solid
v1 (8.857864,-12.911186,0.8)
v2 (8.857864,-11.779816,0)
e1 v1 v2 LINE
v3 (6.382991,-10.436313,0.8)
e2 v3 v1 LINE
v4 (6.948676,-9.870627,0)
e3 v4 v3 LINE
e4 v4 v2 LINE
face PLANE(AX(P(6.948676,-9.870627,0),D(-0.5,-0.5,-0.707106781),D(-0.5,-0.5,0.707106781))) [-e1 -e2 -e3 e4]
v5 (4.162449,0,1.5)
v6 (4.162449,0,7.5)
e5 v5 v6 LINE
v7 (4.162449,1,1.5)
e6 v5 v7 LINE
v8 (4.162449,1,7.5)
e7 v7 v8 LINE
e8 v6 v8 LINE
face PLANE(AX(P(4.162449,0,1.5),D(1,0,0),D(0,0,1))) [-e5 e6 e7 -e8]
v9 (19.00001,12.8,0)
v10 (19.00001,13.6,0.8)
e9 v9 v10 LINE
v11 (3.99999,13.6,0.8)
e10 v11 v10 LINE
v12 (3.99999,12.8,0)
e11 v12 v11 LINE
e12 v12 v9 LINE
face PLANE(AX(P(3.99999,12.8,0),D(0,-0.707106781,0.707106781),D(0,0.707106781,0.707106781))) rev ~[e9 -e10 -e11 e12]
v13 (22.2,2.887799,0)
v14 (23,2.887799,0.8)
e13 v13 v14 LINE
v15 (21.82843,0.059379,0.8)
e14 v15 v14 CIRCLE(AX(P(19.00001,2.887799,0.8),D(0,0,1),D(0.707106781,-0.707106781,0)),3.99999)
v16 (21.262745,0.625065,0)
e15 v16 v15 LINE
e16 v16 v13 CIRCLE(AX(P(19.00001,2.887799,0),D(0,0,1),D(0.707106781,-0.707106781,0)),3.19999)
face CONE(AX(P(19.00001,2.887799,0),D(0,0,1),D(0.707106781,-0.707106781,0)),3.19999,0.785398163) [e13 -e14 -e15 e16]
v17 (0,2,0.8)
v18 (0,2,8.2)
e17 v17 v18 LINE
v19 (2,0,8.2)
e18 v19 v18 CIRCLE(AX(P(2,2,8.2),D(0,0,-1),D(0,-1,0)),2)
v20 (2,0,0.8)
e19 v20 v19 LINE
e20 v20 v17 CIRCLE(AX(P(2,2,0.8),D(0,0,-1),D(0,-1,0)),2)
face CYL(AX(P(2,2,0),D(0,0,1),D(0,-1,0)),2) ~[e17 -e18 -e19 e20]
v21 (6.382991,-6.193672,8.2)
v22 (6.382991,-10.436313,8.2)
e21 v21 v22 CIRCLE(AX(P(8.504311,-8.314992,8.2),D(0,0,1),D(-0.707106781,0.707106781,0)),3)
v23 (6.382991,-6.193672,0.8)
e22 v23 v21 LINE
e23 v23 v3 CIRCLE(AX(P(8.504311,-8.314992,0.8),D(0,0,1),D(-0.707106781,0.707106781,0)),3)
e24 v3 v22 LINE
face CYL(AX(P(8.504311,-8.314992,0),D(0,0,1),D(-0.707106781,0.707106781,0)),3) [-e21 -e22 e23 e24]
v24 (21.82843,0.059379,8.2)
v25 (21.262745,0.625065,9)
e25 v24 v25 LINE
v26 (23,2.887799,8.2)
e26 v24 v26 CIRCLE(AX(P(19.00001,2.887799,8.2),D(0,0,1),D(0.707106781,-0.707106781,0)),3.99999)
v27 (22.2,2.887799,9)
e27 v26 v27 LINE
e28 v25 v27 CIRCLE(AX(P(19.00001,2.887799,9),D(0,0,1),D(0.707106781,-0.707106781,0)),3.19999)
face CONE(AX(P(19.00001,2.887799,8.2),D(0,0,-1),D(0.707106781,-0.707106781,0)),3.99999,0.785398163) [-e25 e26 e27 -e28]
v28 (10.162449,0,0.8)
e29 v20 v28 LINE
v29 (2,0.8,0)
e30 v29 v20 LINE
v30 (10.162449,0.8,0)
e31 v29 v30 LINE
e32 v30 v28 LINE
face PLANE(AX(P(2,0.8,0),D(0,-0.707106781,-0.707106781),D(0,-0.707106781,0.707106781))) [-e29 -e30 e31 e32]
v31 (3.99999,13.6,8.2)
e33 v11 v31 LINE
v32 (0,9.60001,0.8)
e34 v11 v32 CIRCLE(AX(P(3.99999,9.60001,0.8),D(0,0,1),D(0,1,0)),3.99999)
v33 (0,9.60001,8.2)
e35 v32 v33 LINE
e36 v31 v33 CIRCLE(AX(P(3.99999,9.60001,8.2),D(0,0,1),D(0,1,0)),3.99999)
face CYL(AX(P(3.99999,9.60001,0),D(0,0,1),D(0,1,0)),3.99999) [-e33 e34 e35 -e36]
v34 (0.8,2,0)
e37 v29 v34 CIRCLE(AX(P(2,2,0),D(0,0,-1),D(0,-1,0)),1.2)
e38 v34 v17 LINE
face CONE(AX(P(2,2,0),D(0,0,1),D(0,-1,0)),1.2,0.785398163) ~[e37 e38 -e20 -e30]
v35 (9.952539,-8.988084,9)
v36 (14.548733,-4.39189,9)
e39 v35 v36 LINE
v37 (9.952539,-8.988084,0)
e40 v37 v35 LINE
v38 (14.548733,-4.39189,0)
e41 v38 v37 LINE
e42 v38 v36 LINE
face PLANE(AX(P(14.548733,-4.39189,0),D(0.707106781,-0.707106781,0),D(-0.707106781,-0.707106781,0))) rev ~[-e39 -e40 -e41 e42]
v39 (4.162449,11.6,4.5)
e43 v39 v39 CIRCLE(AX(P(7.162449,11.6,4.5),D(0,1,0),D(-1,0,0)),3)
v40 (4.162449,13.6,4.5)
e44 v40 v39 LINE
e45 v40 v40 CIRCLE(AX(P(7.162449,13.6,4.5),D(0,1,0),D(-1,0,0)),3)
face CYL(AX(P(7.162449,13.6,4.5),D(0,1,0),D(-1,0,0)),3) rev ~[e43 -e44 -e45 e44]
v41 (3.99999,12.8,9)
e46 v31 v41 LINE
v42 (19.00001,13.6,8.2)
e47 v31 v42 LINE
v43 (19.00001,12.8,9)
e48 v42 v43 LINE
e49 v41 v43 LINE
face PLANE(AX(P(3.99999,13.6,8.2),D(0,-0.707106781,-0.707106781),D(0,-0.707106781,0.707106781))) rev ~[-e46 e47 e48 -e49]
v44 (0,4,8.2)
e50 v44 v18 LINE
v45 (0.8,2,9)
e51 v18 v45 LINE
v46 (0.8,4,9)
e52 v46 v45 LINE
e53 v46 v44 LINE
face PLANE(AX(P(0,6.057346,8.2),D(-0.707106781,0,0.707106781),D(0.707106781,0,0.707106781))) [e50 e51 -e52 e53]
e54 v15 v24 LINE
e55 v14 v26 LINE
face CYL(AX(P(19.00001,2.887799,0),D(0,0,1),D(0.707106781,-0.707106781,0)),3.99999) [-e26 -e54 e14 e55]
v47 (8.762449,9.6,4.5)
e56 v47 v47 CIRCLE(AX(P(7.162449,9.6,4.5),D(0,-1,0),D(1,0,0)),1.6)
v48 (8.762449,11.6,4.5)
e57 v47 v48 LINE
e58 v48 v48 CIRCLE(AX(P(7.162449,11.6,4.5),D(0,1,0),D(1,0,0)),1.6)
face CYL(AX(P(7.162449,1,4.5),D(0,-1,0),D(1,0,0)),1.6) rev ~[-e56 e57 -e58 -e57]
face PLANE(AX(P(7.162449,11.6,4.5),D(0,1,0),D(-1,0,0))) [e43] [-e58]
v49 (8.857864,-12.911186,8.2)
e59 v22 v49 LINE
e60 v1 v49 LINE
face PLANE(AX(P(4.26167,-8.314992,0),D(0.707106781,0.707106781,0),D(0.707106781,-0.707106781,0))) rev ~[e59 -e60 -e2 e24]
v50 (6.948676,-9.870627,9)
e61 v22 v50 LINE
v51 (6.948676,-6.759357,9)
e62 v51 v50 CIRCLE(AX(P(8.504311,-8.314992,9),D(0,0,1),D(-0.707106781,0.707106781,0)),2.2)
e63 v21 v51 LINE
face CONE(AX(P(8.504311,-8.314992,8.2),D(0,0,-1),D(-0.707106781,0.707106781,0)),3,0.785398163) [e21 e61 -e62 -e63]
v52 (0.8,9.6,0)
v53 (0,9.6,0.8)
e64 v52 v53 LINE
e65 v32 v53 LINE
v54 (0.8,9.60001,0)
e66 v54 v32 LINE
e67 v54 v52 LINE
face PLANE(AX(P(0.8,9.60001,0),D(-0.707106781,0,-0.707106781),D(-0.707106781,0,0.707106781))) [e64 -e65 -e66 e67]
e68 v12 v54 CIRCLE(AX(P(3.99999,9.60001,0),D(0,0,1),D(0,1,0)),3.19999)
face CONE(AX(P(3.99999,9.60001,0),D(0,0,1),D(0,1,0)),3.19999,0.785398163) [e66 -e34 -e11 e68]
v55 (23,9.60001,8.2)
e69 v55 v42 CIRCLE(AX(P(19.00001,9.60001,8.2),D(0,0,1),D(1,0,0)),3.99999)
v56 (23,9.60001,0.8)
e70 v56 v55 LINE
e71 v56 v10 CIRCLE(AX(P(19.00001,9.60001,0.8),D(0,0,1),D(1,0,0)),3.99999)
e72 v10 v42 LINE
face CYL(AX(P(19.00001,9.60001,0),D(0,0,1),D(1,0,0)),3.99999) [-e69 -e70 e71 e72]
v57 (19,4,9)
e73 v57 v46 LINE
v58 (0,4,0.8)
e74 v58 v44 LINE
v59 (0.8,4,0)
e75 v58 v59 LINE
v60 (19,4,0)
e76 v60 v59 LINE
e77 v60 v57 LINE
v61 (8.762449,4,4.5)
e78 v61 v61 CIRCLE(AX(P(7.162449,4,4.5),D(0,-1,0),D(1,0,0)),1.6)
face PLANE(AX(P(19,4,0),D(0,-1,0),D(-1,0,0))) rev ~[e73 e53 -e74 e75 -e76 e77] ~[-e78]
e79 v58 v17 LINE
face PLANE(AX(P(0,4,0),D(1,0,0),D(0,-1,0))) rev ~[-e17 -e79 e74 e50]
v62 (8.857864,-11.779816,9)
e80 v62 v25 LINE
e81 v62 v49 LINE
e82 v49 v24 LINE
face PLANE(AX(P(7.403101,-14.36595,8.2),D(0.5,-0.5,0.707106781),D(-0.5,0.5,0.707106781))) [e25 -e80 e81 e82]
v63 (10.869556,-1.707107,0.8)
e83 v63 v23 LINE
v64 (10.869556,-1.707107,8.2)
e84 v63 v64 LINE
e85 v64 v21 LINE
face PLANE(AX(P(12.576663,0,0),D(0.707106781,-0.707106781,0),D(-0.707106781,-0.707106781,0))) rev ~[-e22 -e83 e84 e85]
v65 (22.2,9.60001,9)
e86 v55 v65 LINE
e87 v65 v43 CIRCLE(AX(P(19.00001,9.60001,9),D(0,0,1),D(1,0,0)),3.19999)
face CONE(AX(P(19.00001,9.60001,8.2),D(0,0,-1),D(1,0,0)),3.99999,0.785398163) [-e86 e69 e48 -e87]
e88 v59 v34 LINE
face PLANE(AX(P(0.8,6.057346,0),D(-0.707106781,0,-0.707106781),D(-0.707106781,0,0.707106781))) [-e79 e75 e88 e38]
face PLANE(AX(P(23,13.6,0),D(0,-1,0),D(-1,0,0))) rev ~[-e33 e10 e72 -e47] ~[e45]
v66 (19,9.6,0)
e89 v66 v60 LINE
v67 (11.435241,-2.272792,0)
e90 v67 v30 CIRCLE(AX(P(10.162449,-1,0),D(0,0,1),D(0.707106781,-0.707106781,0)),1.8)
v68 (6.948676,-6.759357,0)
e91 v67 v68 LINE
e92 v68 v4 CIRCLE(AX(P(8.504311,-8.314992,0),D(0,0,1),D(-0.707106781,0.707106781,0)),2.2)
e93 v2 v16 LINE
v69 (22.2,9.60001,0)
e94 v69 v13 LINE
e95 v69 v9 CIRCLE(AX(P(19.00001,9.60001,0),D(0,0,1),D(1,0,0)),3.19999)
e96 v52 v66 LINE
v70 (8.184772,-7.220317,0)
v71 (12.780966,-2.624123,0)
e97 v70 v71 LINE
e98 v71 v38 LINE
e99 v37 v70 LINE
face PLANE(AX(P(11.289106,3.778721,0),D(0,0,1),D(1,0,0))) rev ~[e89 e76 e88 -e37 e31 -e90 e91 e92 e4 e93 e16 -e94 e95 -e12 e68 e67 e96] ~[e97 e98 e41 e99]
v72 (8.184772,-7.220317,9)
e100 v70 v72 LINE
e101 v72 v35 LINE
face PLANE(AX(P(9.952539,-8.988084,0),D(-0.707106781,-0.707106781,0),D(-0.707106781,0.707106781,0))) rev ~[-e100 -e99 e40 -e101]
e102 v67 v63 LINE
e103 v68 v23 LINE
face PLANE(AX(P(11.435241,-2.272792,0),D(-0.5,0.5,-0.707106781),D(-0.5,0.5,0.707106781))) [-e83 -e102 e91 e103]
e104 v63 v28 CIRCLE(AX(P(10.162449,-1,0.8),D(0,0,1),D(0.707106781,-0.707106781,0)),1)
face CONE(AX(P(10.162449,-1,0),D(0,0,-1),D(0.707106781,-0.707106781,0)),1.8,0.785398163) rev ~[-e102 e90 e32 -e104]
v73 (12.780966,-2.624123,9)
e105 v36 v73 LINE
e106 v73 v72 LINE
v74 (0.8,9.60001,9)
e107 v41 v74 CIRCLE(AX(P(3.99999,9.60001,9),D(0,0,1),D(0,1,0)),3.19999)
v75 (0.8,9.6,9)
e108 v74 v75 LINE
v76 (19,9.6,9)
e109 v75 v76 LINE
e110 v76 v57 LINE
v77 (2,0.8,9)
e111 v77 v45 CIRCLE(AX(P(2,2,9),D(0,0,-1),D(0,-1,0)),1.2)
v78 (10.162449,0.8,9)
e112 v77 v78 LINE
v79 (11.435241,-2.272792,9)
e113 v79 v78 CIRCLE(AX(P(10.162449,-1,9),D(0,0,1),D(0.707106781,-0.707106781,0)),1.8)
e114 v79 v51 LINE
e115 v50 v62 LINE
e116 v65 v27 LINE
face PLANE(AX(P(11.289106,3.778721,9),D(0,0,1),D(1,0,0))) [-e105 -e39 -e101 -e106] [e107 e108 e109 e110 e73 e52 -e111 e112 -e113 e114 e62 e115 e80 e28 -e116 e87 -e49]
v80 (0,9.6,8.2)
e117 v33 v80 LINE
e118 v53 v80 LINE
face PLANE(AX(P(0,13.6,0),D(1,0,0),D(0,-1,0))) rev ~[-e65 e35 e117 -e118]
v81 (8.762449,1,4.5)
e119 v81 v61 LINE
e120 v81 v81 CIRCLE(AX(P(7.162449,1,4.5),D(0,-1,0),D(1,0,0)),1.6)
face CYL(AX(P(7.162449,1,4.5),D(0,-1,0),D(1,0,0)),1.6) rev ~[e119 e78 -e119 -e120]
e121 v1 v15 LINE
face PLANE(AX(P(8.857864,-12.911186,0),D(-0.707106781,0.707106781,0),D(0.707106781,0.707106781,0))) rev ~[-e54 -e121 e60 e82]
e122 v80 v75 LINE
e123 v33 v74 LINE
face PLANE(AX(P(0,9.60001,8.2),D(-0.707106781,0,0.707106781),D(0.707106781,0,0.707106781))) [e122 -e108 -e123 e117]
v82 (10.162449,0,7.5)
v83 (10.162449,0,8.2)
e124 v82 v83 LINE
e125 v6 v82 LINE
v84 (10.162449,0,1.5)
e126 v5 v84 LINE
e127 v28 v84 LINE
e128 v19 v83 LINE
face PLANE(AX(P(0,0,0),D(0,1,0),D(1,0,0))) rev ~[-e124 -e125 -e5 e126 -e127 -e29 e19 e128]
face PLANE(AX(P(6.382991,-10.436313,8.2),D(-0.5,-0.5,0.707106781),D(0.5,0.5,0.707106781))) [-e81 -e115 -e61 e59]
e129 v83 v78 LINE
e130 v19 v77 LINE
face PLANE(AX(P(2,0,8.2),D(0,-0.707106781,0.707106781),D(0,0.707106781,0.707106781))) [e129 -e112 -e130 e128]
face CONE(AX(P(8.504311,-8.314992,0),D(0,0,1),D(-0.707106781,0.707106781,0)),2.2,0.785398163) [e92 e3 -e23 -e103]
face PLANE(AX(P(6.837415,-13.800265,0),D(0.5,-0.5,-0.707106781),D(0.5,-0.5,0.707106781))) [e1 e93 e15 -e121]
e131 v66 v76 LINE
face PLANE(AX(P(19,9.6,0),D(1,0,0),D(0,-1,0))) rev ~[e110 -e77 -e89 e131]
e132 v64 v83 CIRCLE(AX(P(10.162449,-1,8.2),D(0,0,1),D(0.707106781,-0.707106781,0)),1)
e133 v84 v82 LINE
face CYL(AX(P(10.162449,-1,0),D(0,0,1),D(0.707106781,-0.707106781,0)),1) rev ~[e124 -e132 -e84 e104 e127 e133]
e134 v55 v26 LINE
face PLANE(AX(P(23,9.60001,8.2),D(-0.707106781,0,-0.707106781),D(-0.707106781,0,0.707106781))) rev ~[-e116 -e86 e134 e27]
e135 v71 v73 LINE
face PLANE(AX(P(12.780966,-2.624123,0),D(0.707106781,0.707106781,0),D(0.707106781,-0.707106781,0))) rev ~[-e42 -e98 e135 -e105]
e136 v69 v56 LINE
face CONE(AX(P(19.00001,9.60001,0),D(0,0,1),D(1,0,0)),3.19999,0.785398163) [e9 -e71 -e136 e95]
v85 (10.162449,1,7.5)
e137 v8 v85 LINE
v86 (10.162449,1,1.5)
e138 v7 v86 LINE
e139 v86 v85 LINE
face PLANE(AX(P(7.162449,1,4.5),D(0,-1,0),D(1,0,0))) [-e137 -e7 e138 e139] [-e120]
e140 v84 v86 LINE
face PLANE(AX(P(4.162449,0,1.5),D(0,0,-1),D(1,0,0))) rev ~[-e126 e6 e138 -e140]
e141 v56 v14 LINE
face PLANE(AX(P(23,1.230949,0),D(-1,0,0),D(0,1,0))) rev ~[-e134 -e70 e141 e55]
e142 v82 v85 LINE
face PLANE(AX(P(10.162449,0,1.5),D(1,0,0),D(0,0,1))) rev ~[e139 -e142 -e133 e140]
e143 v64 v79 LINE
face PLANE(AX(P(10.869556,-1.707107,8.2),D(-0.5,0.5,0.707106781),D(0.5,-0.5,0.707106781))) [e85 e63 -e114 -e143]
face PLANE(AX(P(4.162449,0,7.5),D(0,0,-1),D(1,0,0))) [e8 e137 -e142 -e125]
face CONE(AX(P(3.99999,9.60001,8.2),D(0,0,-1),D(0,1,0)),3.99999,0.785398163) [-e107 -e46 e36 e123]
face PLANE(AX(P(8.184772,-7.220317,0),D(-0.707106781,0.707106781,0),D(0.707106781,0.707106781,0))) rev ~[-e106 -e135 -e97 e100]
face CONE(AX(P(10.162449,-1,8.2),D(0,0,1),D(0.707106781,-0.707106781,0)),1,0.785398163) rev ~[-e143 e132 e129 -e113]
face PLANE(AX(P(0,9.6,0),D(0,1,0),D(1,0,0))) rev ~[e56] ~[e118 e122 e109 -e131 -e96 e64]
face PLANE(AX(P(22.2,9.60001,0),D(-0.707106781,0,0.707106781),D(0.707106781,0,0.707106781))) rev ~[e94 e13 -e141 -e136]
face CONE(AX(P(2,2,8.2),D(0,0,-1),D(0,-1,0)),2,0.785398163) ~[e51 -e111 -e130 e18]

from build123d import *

# Parameters (mm, degrees)
F1_DEPTH      = 9
F2_R          = 3.99999
F3_R          = 1
F4_R          = 2
F5_W          = 6
F5_H          = 6
F6_DEPTH      = 1
F7_R          = 1.6
F8_DEPTH      = 12.601
F9_R          = 3
F9_R_2        = 1.6
F10_DEPTH     = 2
F12_DEPTH     = 9.001
F13_R         = 3
F14_T1_DEPTH  = 20.400496283
F14_T3_DEPTH  = 8.1624490891
F14_T5_DEPTH  = 15.00002
F14_T7_DEPTH  = 6.3449613941
F14_T9_DEPTH  = 5.5573463904
F14_T11_DEPTH = 4.0573463904
F14_T13_DEPTH = 2.0573563904
F14_T15_DEPTH = 6.7122106995
F14_T18_ANGLE = 90
F14_T20_ANGLE = 135
F14_T22_ANGLE = 90
F14_T24_ANGLE = 90
F14_T26_ANGLE = 90
F14_T28_ANGLE = 45
F14_T30_ANGLE = 90
F14_T32_ANGLE = 135
F14_T34_ANGLE = 90
F14_T36_ANGLE = 45
F14_T38_ANGLE = 90
F14_T40_ANGLE = 90


# Not quite as in the source:
# - a fillet or chamfer that OpenCascade refuses, or shapes differently, is made with other operations: its cross-section is extruded or revolved along the edge and cut away or added
# - a fillet or chamfer is up to 0.001 mm smaller than in the source, because OpenCascade refuses the exact size


with BuildPart() as f1:
    # F0 (on Top) → F1 (new body)
    with BuildSketch(Plane.XY):
        Polygon((0, 4), (0, 0), (12.5766626515, 0), (4.2616702986, -8.3149923529), (8.8578643763, -12.9111864306), (23, 1.2309491931), (23, 13.6), (0, 13.6), (0, 9.6), (19, 9.6), (19, 4), align=None)
    extrude(amount=F1_DEPTH)

    # F2 (radius 4 in the source; OpenCascade refuses exactly that, so slightly less here)
    f2_edges = [f1.edges().sort_by_distance(p)[0] for p in [
        (23, 13.6, 4.5),
        (0, 13.6, 4.5),
        (23, 1.230949, 4.5),
    ]]
    fillet(f2_edges, radius=F2_R)

    # F3
    f3_edges = [f1.edges().sort_by_distance(p)[0] for p in [
        (12.576663, 0, 4.5),
    ]]
    fillet(f3_edges, radius=F3_R)

    # F4
    f4_edges = [f1.edges().sort_by_distance(p)[0] for p in [
        (0, 0, 4.5),
    ]]
    fillet(f4_edges, radius=F4_R)

    # F5 (on face) → F6 (cut)
    with BuildSketch(Plane.XZ):
        with Locations((7.1624490891, 4.5)):
            Rectangle(F5_W, F5_H)
    extrude(amount=-F6_DEPTH, mode=Mode.SUBTRACT)

    # F7 (on face) → F8 (cut, through all)
    with BuildSketch(Plane.XZ.offset(-1)):
        with Locations((7.1624490891, 4.5)):
            Circle(F7_R)
    extrude(amount=-F8_DEPTH, mode=Mode.SUBTRACT)

    # F9 (on face) → F10 (cut)
    with BuildSketch(Plane(origin=(0, 13.6, 0), x_dir=(-1, 0, 0), z_dir=(0, 1, 0))):
        with Locations((-7.1624490891, 4.5)):
            Circle(F9_R)
        with Locations((-7.1624490891, 4.5)):
            Circle(F9_R_2, mode=Mode.SUBTRACT)
    extrude(amount=-F10_DEPTH, mode=Mode.SUBTRACT)

    # F11 (on face) → F12 (cut, through all)
    with BuildSketch(Plane(origin=(0, 0, 0), x_dir=(1, 0, 0), z_dir=(0, 0, -1))):
        Polygon((12.7809664736, 2.6241233026), (14.5487334265, 4.3918902556), (9.9525393488, 8.9880843333), (8.1847723959, 7.2203173803), align=None)
    extrude(amount=-F12_DEPTH, mode=Mode.SUBTRACT)

    # F13
    f13_edges = [f1.edges().sort_by_distance(p)[0] for p in [
        (4.26167, -8.314992, 4.5),
    ]]
    fillet(f13_edges, radius=F13_R)

    # F14: chamfer of 0.8 on 4 edges, made by hand

    # F14_s2 → F14_t1 (cut)
    with BuildSketch(Plane(origin=(-3.4814246111, -3.4814246111, 0), x_dir=(0, 0, 1), z_dir=(0.7071067812, 0.7071067812, 0))):
        Polygon((8.2, 15.3930434455), (9, 14.5930434455), (9, 15.3930434455), align=None)
        Polygon((0, 14.5930434455), (0.8, 15.3930434455), (0, 15.3930434455), align=None)
    extrude(amount=F14_T1_DEPTH, mode=Mode.SUBTRACT)

    # F14_s4 → F14_t3 (cut)
    with BuildSketch(Plane.YZ.offset(2)):
        Polygon((0, 8.2), (0.8, 9), (0, 9), align=None)
        Polygon((0.8, 0), (0, 0.8), (0, 0), align=None)
    extrude(amount=F14_T3_DEPTH, mode=Mode.SUBTRACT)

    # F14_s6 → F14_t5 (cut)
    with BuildSketch(Plane.YZ.offset(3.99999)):
        Polygon((12.8, 0), (13.6, 0.8), (13.6, 0), align=None)
        Polygon((13.6, 8.2), (12.8, 9), (13.6, 9), align=None)
    extrude(amount=F14_T5_DEPTH, mode=Mode.SUBTRACT)

    # F14_s8 → F14_t7 (cut)
    with BuildSketch(Plane(origin=(4.5812245445, 4.5812245445, 0), x_dir=(0, 0, 1), z_dir=(-0.7071067812, -0.7071067812, 0))):
        Polygon((0, -9.6930434455), (0.8, -8.8930434455), (0, -8.8930434455), align=None)
        Polygon((8.2, -8.8930434455), (9, -9.6930434455), (9, -8.8930434455), align=None)
    extrude(amount=F14_T7_DEPTH, mode=Mode.SUBTRACT)

    # F14_s10 → F14_t9 (cut)
    with BuildSketch(Plane(origin=(8.4096516693, -8.4096516693, 0), x_dir=(0, 0, 1), z_dir=(0.7071067812, -0.7071067812, 0))):
        Polygon((0, 2.066131511), (0.8, 2.866131511), (0, 2.866131511), align=None)
        Polygon((8.2, 2.866131511), (9, 2.066131511), (9, 2.866131511), align=None)
    extrude(amount=F14_T9_DEPTH, mode=Mode.SUBTRACT)

    # F14_s12 → F14_t11 (cut)
    with BuildSketch(Plane.XZ.offset(-6.0573463904)):
        Polygon((0.8, 0), (0, 0.8), (0, 0), align=None)
        Polygon((0, 8.2), (0.8, 9), (0, 9), align=None)
    extrude(amount=F14_T11_DEPTH, mode=Mode.SUBTRACT)

    # F14_s14 → F14_t13 (cut)
    with BuildSketch(Plane.XZ.offset(-9.60001)):
        Polygon((0.8, 0), (0, 0.8), (0, 0), align=None)
        Polygon((0, 8.2), (0.8, 9), (0, 9), align=None)
    extrude(amount=F14_T13_DEPTH, mode=Mode.SUBTRACT)

    # F14_s16 → F14_t15 (cut)
    with BuildSketch(Plane.XZ.offset(-9.60001)):
        Polygon((22.2, 0), (23, 0.8), (23, 0), align=None)
        Polygon((23, 8.2), (22.2, 9), (23, 9), align=None)
    extrude(amount=F14_T15_DEPTH, mode=Mode.SUBTRACT)

    # F14_s17 → F14_t18 (revolve, cut)
    with BuildSketch(Plane.YZ.offset(2)):
        Polygon((0.8, 0), (0, 0.8), (0, 0), align=None)
    revolve(axis=Axis((2, 2, 0), (0, 0, -1)), revolution_arc=F14_T18_ANGLE, mode=Mode.SUBTRACT)

    # F14_s19 → F14_t20 (revolve, cut)
    with BuildSketch(Plane(origin=(4.5812245445, 4.5812245445, 0), x_dir=(0, 0, 1), z_dir=(-0.7071067812, -0.7071067812, 0))):
        Polygon((0, -9.6930434455), (0.8, -8.8930434455), (0, -8.8930434455), align=None)
    revolve(axis=Axis((10.1624490891, -1, 0), (0, 0, 1)), revolution_arc=F14_T20_ANGLE, mode=Mode.SUBTRACT)

    # F14_s21 → F14_t22 (revolve, cut)
    with BuildSketch(Plane(origin=(0.0946593164, 0.0946593164, 0), x_dir=(0, 0, 1), z_dir=(0.7071067812, 0.7071067812, 0))):
        Polygon((0, 9.6930434455), (0.8, 8.8930434455), (0, 8.8930434455), align=None)
    revolve(axis=Axis((8.5043109857, -8.3149923529, 0), (0, 0, 1)), revolution_arc=F14_T22_ANGLE, mode=Mode.SUBTRACT)

    # F14_s23 → F14_t24 (revolve, cut)
    with BuildSketch(Plane.XZ.offset(-9.60001)):
        Polygon((22.2, 0), (23, 0.8), (23, 0), align=None)
    revolve(axis=Axis((19.00001, 9.60001, 0), (0, 0, 1)), revolution_arc=F14_T24_ANGLE, mode=Mode.SUBTRACT)

    # F14_s25 → F14_t26 (revolve, cut)
    with BuildSketch(Plane.YZ.offset(3.99999)):
        Polygon((12.8, 0), (13.6, 0.8), (13.6, 0), align=None)
    revolve(axis=Axis((3.99999, 9.60001, 0), (0, 0, 1)), revolution_arc=F14_T26_ANGLE, mode=Mode.SUBTRACT)

    # F14_s27 → F14_t28 (revolve, cut)
    with BuildSketch(Plane(origin=(10.9439046502, 10.9439046502, 0), x_dir=(0, 0, 1), z_dir=(-0.7071067812, -0.7071067812, 0))):
        Polygon((0, -14.5930434455), (0.8, -15.3930434455), (0, -15.3930434455), align=None)
    revolve(axis=Axis((19.00001, 2.8877993005, 0), (0, 0, 1)), revolution_arc=F14_T28_ANGLE, mode=Mode.SUBTRACT)

    # F14_s29 → F14_t30 (revolve, cut)
    with BuildSketch(Plane.YZ.offset(2)):
        Polygon((0, 8.2), (0.8, 9), (0, 9), align=None)
    revolve(axis=Axis((2, 2, 9), (0, 0, -1)), revolution_arc=F14_T30_ANGLE, mode=Mode.SUBTRACT)

    # F14_s31 → F14_t32 (revolve, cut)
    with BuildSketch(Plane(origin=(4.5812245445, 4.5812245445, 0), x_dir=(0, 0, 1), z_dir=(-0.7071067812, -0.7071067812, 0))):
        Polygon((8.2, -8.8930434455), (9, -9.6930434455), (9, -8.8930434455), align=None)
    revolve(axis=Axis((10.1624490891, -1, 9), (0, 0, 1)), revolution_arc=F14_T32_ANGLE, mode=Mode.SUBTRACT)

    # F14_s33 → F14_t34 (revolve, cut)
    with BuildSketch(Plane(origin=(0.0946593164, 0.0946593164, 0), x_dir=(0, 0, 1), z_dir=(0.7071067812, 0.7071067812, 0))):
        Polygon((8.2, 8.8930434455), (9, 9.6930434455), (9, 8.8930434455), align=None)
    revolve(axis=Axis((8.5043109857, -8.3149923529, 9), (0, 0, 1)), revolution_arc=F14_T34_ANGLE, mode=Mode.SUBTRACT)

    # F14_s35 → F14_t36 (revolve, cut)
    with BuildSketch(Plane(origin=(10.9439046502, 10.9439046502, 0), x_dir=(0, 0, 1), z_dir=(-0.7071067812, -0.7071067812, 0))):
        Polygon((8.2, -15.3930434455), (9, -14.5930434455), (9, -15.3930434455), align=None)
    revolve(axis=Axis((19.00001, 2.8877993005, 9), (0, 0, 1)), revolution_arc=F14_T36_ANGLE, mode=Mode.SUBTRACT)

    # F14_s37 → F14_t38 (revolve, cut)
    with BuildSketch(Plane.XZ.offset(-9.60001)):
        Polygon((23, 8.2), (22.2, 9), (23, 9), align=None)
    revolve(axis=Axis((19.00001, 9.60001, 9), (0, 0, 1)), revolution_arc=F14_T38_ANGLE, mode=Mode.SUBTRACT)

    # F14_s39 → F14_t40 (revolve, cut)
    with BuildSketch(Plane.YZ.offset(3.99999)):
        Polygon((13.6, 8.2), (12.8, 9), (13.6, 9), align=None)
    revolve(axis=Axis((3.99999, 9.60001, 9), (0, 0, 1)), revolution_arc=F14_T40_ANGLE, mode=Mode.SUBTRACT)


solid = f1.part
